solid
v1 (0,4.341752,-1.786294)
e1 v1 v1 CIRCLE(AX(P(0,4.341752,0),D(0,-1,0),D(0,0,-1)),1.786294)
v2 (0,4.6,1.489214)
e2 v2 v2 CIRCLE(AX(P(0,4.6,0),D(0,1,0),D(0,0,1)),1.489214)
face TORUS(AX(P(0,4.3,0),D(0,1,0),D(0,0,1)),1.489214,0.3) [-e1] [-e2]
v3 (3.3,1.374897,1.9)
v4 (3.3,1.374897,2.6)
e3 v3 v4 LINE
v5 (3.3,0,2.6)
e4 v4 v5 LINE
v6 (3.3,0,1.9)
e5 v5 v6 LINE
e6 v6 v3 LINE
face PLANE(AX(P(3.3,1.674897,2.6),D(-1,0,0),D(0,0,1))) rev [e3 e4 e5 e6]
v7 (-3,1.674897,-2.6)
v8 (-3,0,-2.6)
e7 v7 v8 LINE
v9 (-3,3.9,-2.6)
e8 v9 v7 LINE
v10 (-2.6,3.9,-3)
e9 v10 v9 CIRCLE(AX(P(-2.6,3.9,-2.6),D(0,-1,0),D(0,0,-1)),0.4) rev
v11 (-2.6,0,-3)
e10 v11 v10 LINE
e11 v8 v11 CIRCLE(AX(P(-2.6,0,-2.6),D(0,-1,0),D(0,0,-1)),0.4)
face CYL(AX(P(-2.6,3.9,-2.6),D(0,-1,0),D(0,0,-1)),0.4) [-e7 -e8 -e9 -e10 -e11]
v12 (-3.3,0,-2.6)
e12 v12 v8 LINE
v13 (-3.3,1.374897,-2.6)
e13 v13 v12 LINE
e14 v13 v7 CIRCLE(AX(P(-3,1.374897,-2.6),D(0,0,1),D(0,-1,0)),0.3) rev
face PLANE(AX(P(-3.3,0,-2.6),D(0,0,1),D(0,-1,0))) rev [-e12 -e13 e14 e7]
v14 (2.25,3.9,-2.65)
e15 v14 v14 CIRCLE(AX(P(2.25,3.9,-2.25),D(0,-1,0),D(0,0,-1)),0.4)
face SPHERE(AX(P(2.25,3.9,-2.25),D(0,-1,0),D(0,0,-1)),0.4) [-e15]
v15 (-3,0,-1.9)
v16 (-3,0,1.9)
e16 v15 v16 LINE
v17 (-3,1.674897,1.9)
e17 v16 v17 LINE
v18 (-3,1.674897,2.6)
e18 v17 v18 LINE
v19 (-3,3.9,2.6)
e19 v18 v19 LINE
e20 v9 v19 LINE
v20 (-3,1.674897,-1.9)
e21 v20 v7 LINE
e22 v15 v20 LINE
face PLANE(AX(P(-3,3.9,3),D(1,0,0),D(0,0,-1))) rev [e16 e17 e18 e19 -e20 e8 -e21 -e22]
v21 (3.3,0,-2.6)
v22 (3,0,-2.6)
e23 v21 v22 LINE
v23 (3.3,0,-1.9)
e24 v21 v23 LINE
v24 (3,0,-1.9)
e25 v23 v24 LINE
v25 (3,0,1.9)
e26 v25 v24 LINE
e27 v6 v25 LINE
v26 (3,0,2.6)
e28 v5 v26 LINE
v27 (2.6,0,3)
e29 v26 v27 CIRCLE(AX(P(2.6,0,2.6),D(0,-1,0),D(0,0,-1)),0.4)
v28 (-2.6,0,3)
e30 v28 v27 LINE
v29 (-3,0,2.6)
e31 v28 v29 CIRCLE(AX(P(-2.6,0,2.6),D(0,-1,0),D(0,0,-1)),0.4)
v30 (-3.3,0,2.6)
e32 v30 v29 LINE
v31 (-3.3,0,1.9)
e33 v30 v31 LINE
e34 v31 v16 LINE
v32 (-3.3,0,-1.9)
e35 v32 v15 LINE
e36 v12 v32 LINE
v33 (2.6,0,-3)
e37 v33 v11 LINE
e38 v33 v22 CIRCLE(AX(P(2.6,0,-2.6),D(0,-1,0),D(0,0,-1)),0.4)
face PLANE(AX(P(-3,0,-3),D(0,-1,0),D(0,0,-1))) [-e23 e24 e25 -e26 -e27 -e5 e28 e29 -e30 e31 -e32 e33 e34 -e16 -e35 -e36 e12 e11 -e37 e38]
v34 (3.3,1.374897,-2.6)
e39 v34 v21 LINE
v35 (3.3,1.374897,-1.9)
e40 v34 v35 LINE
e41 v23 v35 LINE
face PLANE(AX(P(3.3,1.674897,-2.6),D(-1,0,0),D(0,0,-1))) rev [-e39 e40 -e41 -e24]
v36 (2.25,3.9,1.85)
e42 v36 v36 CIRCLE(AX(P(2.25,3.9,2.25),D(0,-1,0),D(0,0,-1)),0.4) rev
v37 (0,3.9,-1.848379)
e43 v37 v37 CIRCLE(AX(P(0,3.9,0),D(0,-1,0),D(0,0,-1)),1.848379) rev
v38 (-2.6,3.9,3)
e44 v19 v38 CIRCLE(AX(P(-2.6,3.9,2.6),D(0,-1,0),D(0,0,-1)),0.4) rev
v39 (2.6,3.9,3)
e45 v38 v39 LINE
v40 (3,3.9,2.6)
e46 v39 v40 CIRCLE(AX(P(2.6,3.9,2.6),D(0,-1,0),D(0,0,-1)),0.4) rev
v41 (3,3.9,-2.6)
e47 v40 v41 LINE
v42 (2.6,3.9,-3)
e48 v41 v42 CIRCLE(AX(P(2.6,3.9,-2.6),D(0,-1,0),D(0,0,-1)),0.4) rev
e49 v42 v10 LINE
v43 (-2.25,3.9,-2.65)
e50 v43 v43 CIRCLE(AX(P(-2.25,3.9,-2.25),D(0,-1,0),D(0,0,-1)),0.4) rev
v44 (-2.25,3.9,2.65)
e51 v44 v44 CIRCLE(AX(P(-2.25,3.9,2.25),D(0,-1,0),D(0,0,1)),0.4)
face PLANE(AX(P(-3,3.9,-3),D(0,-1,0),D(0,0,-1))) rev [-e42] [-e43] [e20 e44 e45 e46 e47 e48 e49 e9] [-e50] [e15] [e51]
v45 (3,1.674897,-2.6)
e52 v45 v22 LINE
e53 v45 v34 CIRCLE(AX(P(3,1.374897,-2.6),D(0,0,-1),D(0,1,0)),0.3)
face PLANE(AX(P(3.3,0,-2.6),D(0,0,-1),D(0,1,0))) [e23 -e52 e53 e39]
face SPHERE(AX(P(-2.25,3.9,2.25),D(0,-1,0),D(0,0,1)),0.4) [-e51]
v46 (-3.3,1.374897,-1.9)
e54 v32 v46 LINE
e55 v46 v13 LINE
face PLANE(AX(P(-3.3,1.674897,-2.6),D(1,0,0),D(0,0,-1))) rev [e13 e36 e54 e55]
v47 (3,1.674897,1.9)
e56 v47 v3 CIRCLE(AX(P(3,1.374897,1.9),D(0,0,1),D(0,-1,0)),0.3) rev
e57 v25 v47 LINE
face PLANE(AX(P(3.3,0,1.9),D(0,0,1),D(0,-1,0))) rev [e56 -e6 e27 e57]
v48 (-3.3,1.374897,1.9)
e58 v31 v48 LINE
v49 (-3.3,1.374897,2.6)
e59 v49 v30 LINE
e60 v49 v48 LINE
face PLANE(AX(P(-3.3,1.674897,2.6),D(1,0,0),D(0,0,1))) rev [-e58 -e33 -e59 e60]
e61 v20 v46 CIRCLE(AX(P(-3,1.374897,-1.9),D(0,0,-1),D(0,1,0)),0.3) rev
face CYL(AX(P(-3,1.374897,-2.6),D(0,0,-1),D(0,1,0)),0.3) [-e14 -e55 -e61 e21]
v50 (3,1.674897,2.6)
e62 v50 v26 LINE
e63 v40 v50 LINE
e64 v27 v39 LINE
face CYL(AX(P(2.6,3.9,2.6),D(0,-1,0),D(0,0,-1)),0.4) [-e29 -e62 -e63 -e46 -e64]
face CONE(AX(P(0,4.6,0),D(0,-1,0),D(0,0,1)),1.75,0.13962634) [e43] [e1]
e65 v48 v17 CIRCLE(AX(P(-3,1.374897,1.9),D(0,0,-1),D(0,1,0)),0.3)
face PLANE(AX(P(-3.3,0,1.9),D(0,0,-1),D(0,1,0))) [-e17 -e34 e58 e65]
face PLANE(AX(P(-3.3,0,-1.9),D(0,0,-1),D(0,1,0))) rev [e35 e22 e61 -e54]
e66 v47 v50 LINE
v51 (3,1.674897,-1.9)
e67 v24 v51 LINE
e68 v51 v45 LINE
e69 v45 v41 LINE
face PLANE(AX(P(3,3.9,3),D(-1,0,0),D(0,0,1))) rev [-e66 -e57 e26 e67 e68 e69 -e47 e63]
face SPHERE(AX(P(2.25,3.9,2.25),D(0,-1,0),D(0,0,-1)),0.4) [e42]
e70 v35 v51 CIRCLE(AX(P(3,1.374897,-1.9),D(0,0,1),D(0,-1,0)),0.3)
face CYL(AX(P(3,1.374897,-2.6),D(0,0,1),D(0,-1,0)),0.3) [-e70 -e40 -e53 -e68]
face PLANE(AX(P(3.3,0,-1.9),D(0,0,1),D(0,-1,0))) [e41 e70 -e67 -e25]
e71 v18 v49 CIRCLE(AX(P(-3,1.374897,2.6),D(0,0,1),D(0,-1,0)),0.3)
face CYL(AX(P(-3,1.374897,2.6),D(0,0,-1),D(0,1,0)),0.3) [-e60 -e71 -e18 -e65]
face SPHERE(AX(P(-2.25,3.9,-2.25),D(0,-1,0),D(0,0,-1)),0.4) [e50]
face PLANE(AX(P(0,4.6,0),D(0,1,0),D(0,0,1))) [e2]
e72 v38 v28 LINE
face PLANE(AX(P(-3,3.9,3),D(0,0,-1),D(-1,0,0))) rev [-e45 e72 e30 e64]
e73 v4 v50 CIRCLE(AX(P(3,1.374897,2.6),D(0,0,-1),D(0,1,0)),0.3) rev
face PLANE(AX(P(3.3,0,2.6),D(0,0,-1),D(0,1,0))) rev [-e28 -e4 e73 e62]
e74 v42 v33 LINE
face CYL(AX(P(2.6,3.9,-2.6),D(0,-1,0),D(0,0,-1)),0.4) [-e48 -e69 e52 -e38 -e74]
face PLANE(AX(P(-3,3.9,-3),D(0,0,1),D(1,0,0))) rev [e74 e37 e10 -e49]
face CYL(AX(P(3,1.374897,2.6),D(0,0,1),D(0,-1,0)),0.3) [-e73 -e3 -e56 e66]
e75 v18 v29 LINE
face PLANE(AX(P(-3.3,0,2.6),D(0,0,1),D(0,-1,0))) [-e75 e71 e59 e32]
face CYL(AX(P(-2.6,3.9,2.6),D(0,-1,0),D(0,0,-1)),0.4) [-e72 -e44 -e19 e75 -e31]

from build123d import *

# Parameters (mm, degrees)
SKETCH1_W               = 6
SKETCH1_H               = 6
BOSS_EXTRUDE1_DEPTH     = 3.9
SKETCH2_W               = 0.7
SKETCH2_H               = 1.674896981
BOSS_EXTRUDE2_DEPTH     = 0.3
SKETCH3_R               = 0.4
BOSS_EXTRUDE3_DEPTH     = 0.4
MIRROR2_COPY_1_SKETCH_W = 0.7
MIRROR2_COPY_1_SKETCH_H = 1.674896981
MIRROR2_COPY_1_DEPTH    = 0.3
MIRROR2_COPY_2_SKETCH_R = 0.4
MIRROR2_COPY_2_DEPTH    = 0.4
FILLET1_R               = 0.4
FILLET2_R               = 0.4
SKETCH4_R               = 1.75
BOSS_EXTRUDE4_DEPTH     = 0.7
DRAFT1_ANGLE            = 8
FILLET3_R               = 0.3
FILLET4_R               = 0.3


with BuildPart() as part:
    # Sketch1 → Boss-Extrude1 (new body)
    with BuildSketch(Plane(origin=(0, 0, 0), x_dir=(1, 0, 0), z_dir=(0, 1, 0))):
        Rectangle(SKETCH1_W, SKETCH1_H)
    extrude(amount=BOSS_EXTRUDE1_DEPTH)

    # Sketch2 → Boss-Extrude2 (add)
    with BuildSketch(Plane(origin=(3, 0, 0), x_dir=(0, 0, -1), z_dir=(1, 0, 0))):
        with Locations((-2.25, 0.837448491)):
            Rectangle(SKETCH2_W, SKETCH2_H)
    boss_extrude2 = extrude(amount=BOSS_EXTRUDE2_DEPTH)

    # Sketch3 → Boss-Extrude3 (add)
    with BuildSketch(Plane(origin=(0, 3.9, 0), x_dir=(1, 0, 0), z_dir=(0, 1, 0))):
        with Locations(Location((2.25, -2.25, 0), (0, 0, 90))):
            Circle(SKETCH3_R)
    boss_extrude3 = extrude(amount=BOSS_EXTRUDE3_DEPTH)

    # Mirror1: Boss-Extrude2, Boss-Extrude3 across plane
    add(boss_extrude2.mirror(Plane.XY))
    add(boss_extrude3.mirror(Plane.XY))

    # Mirror2: Boss-Extrude2, Boss-Extrude3 across plane
    add(boss_extrude2.mirror(Plane(origin=(0, 0, 0), x_dir=(0, 0, 1), z_dir=(1, 0, 0))))
    add(boss_extrude3.mirror(Plane(origin=(0, 0, 0), x_dir=(0, 0, 1), z_dir=(1, 0, 0))))

    # Mirror2 copy 1 sketch → Mirror2 copy 1 (add)
    with BuildSketch(Plane.ZY.offset(3)):
        with Locations((-2.25, 0.837448491)):
            Rectangle(MIRROR2_COPY_1_SKETCH_W, MIRROR2_COPY_1_SKETCH_H)
    extrude(amount=MIRROR2_COPY_1_DEPTH)

    # Mirror2 copy 2 sketch → Mirror2 copy 2 (add)
    with BuildSketch(Plane(origin=(0, 3.9, 0), x_dir=(-1, 0, 0), z_dir=(0, 1, 0))):
        with Locations(Location((2.25, -2.25, 0), (0, 0, 90))):
            Circle(MIRROR2_COPY_2_SKETCH_R)
    extrude(amount=MIRROR2_COPY_2_DEPTH)

    # Fillet1
    fillet1_edges = [part.edges().sort_by_distance(p)[0] for p in [
        (2.25, 4.3, 2.65),
        (2.25, 4.3, -2.65),
        (-2.25, 4.3, -2.65),
        (-2.25, 4.3, 2.65),
    ]]
    fillet(fillet1_edges, radius=FILLET1_R - 0.0001)  # a hair under: the kernel refuses the full size

    # Fillet2
    fillet2_edges = [part.edges().sort_by_distance(p)[0] for p in [
        (3, 1.95, -3),
        (-3, 1.95, -3),
        (-3, 1.95, 3),
        (3, 1.95, 3),
    ]]
    fillet(fillet2_edges, radius=FILLET2_R)

    # Sketch4 → Boss-Extrude4 (add)
    with BuildSketch(Plane(origin=(0, 3.9, 0), x_dir=(1, 0, 0), z_dir=(0, 1, 0))):
        with Locations(Location((0, 0, 0), (0, 0, 90))):
            Circle(SKETCH4_R)
    extrude(amount=BOSS_EXTRUDE4_DEPTH)

    # Draft1
    draft1_faces = [part.faces().sort_by_distance(p)[0] for p in [
        (0, 4.25, 1.75),
    ]]
    draft(draft1_faces, Plane.ZX.offset(4.6), DRAFT1_ANGLE)

    # Fillet3
    fillet3_edges = [part.edges().sort_by_distance(p)[0] for p in [
        (0, 4.6, 1.75),
    ]]
    fillet(fillet3_edges, radius=FILLET3_R)

    # Fillet4
    fillet4_edges = [part.edges().sort_by_distance(p)[0] for p in [
        (-3.3, 1.674896981, -2.25),
        (-3.3, 1.674896981, 2.25),
        (3.3, 1.674896981, -2.25),
        (3.3, 1.674896981, 2.25),
    ]]
    fillet(fillet4_edges, radius=FILLET4_R - 0.0001)  # a hair under: the kernel refuses the full size


solid = part.part
